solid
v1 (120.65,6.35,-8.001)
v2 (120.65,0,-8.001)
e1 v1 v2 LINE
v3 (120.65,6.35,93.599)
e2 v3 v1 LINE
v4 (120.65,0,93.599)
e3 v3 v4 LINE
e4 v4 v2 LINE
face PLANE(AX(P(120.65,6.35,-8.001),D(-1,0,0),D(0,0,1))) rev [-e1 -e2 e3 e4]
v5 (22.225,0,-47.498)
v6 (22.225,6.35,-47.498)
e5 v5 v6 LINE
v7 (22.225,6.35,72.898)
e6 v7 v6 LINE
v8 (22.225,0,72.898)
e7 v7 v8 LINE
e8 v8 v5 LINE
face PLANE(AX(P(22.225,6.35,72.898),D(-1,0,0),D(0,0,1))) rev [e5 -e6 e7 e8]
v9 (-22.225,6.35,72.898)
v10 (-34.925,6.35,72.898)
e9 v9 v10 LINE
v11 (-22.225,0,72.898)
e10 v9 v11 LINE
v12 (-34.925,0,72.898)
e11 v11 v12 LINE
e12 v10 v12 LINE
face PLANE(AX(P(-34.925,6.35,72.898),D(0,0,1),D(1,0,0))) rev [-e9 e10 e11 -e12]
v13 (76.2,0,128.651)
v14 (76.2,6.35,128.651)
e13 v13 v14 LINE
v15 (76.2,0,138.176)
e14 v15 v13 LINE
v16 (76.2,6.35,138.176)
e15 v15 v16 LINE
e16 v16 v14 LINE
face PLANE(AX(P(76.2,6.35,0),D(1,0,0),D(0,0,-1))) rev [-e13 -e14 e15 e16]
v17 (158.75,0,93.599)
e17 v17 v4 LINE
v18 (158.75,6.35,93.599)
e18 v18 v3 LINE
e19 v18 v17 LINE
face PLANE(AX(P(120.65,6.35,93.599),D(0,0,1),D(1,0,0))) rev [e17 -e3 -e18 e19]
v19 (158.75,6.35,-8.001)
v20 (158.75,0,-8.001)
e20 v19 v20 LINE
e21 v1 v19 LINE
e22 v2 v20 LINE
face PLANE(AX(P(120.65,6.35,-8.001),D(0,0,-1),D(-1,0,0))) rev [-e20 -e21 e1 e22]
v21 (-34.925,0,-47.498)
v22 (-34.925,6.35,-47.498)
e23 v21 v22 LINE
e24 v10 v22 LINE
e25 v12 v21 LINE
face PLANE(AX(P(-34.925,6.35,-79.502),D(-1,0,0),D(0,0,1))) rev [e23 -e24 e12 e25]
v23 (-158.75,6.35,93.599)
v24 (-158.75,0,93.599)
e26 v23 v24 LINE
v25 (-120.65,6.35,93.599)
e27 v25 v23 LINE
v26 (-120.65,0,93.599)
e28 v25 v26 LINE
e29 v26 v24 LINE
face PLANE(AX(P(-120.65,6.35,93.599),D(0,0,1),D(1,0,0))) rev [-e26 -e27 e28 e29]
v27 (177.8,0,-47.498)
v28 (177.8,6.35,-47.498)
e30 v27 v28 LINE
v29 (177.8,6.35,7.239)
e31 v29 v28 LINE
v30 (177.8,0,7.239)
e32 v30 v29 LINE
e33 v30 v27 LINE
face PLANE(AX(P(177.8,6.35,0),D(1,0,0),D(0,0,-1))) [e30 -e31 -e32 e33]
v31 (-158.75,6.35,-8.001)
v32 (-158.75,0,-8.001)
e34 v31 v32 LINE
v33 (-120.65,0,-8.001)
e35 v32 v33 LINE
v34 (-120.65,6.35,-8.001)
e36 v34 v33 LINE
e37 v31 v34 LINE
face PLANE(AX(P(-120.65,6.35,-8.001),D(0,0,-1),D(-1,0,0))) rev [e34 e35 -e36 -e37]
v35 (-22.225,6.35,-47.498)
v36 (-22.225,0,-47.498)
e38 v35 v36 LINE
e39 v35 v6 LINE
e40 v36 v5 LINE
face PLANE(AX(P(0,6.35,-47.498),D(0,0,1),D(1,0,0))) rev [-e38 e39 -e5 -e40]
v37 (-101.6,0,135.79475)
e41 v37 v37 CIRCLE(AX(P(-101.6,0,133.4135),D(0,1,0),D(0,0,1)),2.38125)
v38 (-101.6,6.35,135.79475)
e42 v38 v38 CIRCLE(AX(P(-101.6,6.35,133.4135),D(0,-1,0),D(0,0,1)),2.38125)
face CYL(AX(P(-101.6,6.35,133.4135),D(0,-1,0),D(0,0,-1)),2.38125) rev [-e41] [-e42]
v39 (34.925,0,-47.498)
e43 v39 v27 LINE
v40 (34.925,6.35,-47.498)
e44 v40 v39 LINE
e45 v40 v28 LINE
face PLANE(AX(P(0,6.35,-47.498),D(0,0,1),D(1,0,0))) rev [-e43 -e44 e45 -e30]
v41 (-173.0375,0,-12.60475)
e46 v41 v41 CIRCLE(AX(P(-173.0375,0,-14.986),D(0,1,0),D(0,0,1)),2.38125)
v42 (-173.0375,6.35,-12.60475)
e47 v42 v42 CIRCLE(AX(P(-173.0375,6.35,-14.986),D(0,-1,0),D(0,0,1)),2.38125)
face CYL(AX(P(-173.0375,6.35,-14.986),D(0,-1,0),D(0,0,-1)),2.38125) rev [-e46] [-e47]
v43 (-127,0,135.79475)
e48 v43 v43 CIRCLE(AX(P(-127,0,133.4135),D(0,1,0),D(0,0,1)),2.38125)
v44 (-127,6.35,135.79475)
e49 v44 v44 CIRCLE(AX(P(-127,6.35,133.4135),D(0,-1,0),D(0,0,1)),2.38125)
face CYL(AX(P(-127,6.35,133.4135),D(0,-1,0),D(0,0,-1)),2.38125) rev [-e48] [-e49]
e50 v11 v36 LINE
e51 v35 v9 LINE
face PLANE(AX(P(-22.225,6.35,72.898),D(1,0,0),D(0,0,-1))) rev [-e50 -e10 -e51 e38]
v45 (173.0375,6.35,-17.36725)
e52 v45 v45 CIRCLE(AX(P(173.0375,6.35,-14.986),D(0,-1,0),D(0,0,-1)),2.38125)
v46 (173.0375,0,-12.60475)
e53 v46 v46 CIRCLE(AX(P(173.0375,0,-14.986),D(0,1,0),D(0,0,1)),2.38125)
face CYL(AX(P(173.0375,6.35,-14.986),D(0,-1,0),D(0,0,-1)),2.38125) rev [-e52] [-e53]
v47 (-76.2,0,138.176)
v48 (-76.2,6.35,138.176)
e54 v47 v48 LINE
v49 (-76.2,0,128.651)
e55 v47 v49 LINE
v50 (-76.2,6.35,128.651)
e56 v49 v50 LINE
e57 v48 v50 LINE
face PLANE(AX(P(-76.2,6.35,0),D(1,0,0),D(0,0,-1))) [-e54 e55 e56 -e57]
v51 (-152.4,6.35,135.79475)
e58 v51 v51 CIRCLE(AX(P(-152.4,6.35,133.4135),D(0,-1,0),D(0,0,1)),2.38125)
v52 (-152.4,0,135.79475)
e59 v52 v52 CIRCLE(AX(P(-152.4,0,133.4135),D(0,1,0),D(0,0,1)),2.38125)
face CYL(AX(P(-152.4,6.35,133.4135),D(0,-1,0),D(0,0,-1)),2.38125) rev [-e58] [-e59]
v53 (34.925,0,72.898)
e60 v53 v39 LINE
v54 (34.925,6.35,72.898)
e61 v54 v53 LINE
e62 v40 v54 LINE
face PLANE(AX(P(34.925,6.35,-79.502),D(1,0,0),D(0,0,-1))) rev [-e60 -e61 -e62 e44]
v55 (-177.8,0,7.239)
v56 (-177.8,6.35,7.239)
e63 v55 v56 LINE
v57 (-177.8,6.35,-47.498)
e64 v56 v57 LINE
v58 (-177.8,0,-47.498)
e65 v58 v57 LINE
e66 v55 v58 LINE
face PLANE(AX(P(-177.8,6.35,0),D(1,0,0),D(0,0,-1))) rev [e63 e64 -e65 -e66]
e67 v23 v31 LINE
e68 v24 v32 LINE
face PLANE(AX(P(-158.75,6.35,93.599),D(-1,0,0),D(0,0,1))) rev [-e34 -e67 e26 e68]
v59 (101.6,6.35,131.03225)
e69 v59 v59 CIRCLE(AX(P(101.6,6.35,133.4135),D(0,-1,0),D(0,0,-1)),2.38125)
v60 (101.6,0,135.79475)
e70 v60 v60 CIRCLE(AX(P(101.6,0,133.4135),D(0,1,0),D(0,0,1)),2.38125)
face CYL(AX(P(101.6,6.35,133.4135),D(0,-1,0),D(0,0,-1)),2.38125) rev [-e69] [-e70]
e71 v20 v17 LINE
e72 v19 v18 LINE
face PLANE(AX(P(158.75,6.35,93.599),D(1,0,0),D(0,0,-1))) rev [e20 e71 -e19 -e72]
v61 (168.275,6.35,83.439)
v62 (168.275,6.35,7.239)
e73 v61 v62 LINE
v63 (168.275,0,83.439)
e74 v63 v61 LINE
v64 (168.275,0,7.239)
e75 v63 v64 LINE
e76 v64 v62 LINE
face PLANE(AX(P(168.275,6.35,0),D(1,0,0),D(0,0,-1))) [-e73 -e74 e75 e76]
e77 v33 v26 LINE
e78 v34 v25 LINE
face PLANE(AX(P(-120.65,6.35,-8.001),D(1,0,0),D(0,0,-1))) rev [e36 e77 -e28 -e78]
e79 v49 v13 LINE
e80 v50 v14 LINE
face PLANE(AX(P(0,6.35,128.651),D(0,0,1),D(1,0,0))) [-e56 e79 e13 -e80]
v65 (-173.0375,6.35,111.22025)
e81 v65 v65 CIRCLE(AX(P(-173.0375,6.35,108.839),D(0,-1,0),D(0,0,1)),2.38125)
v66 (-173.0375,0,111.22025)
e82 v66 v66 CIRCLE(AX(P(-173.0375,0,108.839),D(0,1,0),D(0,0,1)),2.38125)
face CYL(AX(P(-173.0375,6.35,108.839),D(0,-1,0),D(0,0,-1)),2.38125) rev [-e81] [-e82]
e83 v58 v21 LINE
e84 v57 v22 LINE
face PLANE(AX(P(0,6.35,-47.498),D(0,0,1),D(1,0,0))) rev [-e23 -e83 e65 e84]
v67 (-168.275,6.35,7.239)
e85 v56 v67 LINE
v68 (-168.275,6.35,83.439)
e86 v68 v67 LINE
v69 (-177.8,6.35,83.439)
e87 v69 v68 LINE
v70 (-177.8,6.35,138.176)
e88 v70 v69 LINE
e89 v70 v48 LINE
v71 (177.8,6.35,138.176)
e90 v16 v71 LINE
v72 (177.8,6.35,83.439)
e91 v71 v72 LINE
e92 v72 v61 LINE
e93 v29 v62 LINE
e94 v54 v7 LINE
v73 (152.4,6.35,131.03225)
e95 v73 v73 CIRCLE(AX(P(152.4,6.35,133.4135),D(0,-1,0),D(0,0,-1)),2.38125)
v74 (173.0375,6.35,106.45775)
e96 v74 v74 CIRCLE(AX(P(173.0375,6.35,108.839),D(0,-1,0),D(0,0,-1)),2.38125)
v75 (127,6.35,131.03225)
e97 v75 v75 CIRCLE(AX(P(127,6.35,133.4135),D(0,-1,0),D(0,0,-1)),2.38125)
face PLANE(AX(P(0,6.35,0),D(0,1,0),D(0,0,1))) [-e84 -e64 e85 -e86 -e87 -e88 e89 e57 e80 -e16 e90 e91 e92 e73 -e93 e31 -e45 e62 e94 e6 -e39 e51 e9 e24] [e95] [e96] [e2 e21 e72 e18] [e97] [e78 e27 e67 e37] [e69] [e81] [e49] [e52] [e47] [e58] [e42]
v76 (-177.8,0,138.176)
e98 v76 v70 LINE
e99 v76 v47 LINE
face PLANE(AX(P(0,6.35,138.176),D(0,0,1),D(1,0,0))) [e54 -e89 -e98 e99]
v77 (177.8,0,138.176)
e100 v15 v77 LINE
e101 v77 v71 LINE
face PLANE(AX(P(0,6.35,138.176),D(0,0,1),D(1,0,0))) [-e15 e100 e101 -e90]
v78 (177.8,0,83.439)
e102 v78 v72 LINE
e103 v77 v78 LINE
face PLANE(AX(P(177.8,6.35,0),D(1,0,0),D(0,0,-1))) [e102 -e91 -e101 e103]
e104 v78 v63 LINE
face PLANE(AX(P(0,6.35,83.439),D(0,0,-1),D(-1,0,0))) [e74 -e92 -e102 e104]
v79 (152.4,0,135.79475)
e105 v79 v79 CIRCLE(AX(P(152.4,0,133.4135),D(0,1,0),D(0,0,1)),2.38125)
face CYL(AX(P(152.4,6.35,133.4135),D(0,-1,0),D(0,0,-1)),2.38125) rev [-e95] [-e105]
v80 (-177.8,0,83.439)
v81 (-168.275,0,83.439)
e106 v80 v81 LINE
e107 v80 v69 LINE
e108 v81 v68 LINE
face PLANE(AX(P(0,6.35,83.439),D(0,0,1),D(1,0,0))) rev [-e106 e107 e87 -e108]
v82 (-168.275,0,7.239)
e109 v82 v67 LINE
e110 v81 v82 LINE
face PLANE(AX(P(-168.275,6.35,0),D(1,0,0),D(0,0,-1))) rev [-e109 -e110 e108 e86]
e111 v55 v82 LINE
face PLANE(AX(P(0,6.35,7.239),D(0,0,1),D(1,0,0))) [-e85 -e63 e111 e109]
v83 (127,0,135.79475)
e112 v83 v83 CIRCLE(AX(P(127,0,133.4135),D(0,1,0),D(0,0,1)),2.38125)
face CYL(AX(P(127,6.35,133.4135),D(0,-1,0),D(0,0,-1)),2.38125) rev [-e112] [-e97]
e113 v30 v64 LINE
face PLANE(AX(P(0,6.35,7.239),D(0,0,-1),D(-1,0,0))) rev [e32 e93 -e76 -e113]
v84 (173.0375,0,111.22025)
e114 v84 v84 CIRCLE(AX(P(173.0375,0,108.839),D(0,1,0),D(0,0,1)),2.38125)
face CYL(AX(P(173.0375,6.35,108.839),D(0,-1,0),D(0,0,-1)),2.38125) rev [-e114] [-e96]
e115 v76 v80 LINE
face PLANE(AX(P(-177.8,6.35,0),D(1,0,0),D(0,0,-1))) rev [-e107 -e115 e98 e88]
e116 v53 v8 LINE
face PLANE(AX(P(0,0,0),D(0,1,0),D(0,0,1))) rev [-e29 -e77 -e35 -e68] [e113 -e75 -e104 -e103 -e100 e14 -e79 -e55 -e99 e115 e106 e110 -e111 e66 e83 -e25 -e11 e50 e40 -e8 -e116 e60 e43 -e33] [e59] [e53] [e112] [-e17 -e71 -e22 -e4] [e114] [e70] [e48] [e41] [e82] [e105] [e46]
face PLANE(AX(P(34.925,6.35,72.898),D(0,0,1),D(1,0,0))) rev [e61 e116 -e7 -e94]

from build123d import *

# Parameters (mm, degrees)
BOSS_EXTRUDE1_DEPTH     = 6.35
CUT_EXTRUDE8_DEPTH      = 226.268216746
CUT_EXTRUDE8_DEPTH_BACK = 226.268216746
SKETCH35_R              = 2.38125
SKETCH36_W              = 12.7
SKETCH36_H              = 152.4
CUT_EXTRUDE9_DEPTH      = 226.268216746
SKETCH37_W              = 38.1
SKETCH37_H              = 101.6
CUT_EXTRUDE10_DEPTH     = 226.268216746


with BuildPart() as part:
    # Sketch1 → Boss-Extrude1 (new body)
    with BuildSketch(Plane(origin=(0, 0, 0), x_dir=(1, 0, 0), z_dir=(0, 1, 0))):
        Polygon((-177.8, -138.176), (-76.2, -138.176), (-76.2, -128.651), (76.2, -128.651), (76.2, -138.176), (177.8, -138.176), (177.8, -83.439), (168.275, -83.439), (168.275, -7.239), (177.8, -7.239), (177.8, 47.498), (-177.8, 47.498), (-177.8, -7.239), (-168.275, -7.239), (-168.275, -83.439), (-177.8, -83.439), align=None)
    extrude(amount=BOSS_EXTRUDE1_DEPTH)

    # Sketch35 → Cut-Extrude8 (cut, two sides: drawn at the far end of the back side and taken through both)
    with BuildSketch(Plane(origin=(0, 0, 0), x_dir=(-1, 0, 0), z_dir=(0, -1, 0)).offset(-CUT_EXTRUDE8_DEPTH_BACK)):
        with Locations(Location((-173.0375, 14.986, 0), (0, 0, 90))):
            Circle(SKETCH35_R)
        with Locations(Location((-173.0375, -108.839, 0), (0, 0, 90))):
            Circle(SKETCH35_R)
        with Locations(Location((-101.6, -133.4135, 0), (0, 0, 90))):
            Circle(SKETCH35_R)
        with Locations(Location((-127, -133.4135, 0), (0, 0, 90))):
            Circle(SKETCH35_R)
        with Locations(Location((-152.4, -133.4135, 0), (0, 0, 90))):
            Circle(SKETCH35_R)
        with Locations(Location((101.6, -133.4135, 0), (0, 0, 270))):
            Circle(SKETCH35_R)
        with Locations(Location((127, -133.4135, 0), (0, 0, 270))):
            Circle(SKETCH35_R)
        with Locations(Location((152.4, -133.4135, 0), (0, 0, 270))):
            Circle(SKETCH35_R)
        with Locations(Location((173.0375, -108.839, 0), (0, 0, 270))):
            Circle(SKETCH35_R)
        with Locations(Location((173.0375, 14.986, 0), (0, 0, 270))):
            Circle(SKETCH35_R)
    extrude(amount=CUT_EXTRUDE8_DEPTH + CUT_EXTRUDE8_DEPTH_BACK, mode=Mode.SUBTRACT)

    # Sketch36 → Cut-Extrude9 (cut, through all)
    with BuildSketch(Plane.XZ):
        with Locations((-28.575, -3.302)):
            Rectangle(SKETCH36_W, SKETCH36_H)
        with Locations((28.575, -3.302)):
            Rectangle(SKETCH36_W, SKETCH36_H)
    extrude(amount=-CUT_EXTRUDE9_DEPTH, mode=Mode.SUBTRACT)

    # Sketch37 → Cut-Extrude10 (cut, through all)
    with BuildSketch(Plane.XZ):
        with Locations((-139.7, 42.799)):
            Rectangle(SKETCH37_W, SKETCH37_H)
        with Locations((139.7, 42.799)):
            Rectangle(SKETCH37_W, SKETCH37_H)
    extrude(amount=-CUT_EXTRUDE10_DEPTH, mode=Mode.SUBTRACT)


solid = part.part
